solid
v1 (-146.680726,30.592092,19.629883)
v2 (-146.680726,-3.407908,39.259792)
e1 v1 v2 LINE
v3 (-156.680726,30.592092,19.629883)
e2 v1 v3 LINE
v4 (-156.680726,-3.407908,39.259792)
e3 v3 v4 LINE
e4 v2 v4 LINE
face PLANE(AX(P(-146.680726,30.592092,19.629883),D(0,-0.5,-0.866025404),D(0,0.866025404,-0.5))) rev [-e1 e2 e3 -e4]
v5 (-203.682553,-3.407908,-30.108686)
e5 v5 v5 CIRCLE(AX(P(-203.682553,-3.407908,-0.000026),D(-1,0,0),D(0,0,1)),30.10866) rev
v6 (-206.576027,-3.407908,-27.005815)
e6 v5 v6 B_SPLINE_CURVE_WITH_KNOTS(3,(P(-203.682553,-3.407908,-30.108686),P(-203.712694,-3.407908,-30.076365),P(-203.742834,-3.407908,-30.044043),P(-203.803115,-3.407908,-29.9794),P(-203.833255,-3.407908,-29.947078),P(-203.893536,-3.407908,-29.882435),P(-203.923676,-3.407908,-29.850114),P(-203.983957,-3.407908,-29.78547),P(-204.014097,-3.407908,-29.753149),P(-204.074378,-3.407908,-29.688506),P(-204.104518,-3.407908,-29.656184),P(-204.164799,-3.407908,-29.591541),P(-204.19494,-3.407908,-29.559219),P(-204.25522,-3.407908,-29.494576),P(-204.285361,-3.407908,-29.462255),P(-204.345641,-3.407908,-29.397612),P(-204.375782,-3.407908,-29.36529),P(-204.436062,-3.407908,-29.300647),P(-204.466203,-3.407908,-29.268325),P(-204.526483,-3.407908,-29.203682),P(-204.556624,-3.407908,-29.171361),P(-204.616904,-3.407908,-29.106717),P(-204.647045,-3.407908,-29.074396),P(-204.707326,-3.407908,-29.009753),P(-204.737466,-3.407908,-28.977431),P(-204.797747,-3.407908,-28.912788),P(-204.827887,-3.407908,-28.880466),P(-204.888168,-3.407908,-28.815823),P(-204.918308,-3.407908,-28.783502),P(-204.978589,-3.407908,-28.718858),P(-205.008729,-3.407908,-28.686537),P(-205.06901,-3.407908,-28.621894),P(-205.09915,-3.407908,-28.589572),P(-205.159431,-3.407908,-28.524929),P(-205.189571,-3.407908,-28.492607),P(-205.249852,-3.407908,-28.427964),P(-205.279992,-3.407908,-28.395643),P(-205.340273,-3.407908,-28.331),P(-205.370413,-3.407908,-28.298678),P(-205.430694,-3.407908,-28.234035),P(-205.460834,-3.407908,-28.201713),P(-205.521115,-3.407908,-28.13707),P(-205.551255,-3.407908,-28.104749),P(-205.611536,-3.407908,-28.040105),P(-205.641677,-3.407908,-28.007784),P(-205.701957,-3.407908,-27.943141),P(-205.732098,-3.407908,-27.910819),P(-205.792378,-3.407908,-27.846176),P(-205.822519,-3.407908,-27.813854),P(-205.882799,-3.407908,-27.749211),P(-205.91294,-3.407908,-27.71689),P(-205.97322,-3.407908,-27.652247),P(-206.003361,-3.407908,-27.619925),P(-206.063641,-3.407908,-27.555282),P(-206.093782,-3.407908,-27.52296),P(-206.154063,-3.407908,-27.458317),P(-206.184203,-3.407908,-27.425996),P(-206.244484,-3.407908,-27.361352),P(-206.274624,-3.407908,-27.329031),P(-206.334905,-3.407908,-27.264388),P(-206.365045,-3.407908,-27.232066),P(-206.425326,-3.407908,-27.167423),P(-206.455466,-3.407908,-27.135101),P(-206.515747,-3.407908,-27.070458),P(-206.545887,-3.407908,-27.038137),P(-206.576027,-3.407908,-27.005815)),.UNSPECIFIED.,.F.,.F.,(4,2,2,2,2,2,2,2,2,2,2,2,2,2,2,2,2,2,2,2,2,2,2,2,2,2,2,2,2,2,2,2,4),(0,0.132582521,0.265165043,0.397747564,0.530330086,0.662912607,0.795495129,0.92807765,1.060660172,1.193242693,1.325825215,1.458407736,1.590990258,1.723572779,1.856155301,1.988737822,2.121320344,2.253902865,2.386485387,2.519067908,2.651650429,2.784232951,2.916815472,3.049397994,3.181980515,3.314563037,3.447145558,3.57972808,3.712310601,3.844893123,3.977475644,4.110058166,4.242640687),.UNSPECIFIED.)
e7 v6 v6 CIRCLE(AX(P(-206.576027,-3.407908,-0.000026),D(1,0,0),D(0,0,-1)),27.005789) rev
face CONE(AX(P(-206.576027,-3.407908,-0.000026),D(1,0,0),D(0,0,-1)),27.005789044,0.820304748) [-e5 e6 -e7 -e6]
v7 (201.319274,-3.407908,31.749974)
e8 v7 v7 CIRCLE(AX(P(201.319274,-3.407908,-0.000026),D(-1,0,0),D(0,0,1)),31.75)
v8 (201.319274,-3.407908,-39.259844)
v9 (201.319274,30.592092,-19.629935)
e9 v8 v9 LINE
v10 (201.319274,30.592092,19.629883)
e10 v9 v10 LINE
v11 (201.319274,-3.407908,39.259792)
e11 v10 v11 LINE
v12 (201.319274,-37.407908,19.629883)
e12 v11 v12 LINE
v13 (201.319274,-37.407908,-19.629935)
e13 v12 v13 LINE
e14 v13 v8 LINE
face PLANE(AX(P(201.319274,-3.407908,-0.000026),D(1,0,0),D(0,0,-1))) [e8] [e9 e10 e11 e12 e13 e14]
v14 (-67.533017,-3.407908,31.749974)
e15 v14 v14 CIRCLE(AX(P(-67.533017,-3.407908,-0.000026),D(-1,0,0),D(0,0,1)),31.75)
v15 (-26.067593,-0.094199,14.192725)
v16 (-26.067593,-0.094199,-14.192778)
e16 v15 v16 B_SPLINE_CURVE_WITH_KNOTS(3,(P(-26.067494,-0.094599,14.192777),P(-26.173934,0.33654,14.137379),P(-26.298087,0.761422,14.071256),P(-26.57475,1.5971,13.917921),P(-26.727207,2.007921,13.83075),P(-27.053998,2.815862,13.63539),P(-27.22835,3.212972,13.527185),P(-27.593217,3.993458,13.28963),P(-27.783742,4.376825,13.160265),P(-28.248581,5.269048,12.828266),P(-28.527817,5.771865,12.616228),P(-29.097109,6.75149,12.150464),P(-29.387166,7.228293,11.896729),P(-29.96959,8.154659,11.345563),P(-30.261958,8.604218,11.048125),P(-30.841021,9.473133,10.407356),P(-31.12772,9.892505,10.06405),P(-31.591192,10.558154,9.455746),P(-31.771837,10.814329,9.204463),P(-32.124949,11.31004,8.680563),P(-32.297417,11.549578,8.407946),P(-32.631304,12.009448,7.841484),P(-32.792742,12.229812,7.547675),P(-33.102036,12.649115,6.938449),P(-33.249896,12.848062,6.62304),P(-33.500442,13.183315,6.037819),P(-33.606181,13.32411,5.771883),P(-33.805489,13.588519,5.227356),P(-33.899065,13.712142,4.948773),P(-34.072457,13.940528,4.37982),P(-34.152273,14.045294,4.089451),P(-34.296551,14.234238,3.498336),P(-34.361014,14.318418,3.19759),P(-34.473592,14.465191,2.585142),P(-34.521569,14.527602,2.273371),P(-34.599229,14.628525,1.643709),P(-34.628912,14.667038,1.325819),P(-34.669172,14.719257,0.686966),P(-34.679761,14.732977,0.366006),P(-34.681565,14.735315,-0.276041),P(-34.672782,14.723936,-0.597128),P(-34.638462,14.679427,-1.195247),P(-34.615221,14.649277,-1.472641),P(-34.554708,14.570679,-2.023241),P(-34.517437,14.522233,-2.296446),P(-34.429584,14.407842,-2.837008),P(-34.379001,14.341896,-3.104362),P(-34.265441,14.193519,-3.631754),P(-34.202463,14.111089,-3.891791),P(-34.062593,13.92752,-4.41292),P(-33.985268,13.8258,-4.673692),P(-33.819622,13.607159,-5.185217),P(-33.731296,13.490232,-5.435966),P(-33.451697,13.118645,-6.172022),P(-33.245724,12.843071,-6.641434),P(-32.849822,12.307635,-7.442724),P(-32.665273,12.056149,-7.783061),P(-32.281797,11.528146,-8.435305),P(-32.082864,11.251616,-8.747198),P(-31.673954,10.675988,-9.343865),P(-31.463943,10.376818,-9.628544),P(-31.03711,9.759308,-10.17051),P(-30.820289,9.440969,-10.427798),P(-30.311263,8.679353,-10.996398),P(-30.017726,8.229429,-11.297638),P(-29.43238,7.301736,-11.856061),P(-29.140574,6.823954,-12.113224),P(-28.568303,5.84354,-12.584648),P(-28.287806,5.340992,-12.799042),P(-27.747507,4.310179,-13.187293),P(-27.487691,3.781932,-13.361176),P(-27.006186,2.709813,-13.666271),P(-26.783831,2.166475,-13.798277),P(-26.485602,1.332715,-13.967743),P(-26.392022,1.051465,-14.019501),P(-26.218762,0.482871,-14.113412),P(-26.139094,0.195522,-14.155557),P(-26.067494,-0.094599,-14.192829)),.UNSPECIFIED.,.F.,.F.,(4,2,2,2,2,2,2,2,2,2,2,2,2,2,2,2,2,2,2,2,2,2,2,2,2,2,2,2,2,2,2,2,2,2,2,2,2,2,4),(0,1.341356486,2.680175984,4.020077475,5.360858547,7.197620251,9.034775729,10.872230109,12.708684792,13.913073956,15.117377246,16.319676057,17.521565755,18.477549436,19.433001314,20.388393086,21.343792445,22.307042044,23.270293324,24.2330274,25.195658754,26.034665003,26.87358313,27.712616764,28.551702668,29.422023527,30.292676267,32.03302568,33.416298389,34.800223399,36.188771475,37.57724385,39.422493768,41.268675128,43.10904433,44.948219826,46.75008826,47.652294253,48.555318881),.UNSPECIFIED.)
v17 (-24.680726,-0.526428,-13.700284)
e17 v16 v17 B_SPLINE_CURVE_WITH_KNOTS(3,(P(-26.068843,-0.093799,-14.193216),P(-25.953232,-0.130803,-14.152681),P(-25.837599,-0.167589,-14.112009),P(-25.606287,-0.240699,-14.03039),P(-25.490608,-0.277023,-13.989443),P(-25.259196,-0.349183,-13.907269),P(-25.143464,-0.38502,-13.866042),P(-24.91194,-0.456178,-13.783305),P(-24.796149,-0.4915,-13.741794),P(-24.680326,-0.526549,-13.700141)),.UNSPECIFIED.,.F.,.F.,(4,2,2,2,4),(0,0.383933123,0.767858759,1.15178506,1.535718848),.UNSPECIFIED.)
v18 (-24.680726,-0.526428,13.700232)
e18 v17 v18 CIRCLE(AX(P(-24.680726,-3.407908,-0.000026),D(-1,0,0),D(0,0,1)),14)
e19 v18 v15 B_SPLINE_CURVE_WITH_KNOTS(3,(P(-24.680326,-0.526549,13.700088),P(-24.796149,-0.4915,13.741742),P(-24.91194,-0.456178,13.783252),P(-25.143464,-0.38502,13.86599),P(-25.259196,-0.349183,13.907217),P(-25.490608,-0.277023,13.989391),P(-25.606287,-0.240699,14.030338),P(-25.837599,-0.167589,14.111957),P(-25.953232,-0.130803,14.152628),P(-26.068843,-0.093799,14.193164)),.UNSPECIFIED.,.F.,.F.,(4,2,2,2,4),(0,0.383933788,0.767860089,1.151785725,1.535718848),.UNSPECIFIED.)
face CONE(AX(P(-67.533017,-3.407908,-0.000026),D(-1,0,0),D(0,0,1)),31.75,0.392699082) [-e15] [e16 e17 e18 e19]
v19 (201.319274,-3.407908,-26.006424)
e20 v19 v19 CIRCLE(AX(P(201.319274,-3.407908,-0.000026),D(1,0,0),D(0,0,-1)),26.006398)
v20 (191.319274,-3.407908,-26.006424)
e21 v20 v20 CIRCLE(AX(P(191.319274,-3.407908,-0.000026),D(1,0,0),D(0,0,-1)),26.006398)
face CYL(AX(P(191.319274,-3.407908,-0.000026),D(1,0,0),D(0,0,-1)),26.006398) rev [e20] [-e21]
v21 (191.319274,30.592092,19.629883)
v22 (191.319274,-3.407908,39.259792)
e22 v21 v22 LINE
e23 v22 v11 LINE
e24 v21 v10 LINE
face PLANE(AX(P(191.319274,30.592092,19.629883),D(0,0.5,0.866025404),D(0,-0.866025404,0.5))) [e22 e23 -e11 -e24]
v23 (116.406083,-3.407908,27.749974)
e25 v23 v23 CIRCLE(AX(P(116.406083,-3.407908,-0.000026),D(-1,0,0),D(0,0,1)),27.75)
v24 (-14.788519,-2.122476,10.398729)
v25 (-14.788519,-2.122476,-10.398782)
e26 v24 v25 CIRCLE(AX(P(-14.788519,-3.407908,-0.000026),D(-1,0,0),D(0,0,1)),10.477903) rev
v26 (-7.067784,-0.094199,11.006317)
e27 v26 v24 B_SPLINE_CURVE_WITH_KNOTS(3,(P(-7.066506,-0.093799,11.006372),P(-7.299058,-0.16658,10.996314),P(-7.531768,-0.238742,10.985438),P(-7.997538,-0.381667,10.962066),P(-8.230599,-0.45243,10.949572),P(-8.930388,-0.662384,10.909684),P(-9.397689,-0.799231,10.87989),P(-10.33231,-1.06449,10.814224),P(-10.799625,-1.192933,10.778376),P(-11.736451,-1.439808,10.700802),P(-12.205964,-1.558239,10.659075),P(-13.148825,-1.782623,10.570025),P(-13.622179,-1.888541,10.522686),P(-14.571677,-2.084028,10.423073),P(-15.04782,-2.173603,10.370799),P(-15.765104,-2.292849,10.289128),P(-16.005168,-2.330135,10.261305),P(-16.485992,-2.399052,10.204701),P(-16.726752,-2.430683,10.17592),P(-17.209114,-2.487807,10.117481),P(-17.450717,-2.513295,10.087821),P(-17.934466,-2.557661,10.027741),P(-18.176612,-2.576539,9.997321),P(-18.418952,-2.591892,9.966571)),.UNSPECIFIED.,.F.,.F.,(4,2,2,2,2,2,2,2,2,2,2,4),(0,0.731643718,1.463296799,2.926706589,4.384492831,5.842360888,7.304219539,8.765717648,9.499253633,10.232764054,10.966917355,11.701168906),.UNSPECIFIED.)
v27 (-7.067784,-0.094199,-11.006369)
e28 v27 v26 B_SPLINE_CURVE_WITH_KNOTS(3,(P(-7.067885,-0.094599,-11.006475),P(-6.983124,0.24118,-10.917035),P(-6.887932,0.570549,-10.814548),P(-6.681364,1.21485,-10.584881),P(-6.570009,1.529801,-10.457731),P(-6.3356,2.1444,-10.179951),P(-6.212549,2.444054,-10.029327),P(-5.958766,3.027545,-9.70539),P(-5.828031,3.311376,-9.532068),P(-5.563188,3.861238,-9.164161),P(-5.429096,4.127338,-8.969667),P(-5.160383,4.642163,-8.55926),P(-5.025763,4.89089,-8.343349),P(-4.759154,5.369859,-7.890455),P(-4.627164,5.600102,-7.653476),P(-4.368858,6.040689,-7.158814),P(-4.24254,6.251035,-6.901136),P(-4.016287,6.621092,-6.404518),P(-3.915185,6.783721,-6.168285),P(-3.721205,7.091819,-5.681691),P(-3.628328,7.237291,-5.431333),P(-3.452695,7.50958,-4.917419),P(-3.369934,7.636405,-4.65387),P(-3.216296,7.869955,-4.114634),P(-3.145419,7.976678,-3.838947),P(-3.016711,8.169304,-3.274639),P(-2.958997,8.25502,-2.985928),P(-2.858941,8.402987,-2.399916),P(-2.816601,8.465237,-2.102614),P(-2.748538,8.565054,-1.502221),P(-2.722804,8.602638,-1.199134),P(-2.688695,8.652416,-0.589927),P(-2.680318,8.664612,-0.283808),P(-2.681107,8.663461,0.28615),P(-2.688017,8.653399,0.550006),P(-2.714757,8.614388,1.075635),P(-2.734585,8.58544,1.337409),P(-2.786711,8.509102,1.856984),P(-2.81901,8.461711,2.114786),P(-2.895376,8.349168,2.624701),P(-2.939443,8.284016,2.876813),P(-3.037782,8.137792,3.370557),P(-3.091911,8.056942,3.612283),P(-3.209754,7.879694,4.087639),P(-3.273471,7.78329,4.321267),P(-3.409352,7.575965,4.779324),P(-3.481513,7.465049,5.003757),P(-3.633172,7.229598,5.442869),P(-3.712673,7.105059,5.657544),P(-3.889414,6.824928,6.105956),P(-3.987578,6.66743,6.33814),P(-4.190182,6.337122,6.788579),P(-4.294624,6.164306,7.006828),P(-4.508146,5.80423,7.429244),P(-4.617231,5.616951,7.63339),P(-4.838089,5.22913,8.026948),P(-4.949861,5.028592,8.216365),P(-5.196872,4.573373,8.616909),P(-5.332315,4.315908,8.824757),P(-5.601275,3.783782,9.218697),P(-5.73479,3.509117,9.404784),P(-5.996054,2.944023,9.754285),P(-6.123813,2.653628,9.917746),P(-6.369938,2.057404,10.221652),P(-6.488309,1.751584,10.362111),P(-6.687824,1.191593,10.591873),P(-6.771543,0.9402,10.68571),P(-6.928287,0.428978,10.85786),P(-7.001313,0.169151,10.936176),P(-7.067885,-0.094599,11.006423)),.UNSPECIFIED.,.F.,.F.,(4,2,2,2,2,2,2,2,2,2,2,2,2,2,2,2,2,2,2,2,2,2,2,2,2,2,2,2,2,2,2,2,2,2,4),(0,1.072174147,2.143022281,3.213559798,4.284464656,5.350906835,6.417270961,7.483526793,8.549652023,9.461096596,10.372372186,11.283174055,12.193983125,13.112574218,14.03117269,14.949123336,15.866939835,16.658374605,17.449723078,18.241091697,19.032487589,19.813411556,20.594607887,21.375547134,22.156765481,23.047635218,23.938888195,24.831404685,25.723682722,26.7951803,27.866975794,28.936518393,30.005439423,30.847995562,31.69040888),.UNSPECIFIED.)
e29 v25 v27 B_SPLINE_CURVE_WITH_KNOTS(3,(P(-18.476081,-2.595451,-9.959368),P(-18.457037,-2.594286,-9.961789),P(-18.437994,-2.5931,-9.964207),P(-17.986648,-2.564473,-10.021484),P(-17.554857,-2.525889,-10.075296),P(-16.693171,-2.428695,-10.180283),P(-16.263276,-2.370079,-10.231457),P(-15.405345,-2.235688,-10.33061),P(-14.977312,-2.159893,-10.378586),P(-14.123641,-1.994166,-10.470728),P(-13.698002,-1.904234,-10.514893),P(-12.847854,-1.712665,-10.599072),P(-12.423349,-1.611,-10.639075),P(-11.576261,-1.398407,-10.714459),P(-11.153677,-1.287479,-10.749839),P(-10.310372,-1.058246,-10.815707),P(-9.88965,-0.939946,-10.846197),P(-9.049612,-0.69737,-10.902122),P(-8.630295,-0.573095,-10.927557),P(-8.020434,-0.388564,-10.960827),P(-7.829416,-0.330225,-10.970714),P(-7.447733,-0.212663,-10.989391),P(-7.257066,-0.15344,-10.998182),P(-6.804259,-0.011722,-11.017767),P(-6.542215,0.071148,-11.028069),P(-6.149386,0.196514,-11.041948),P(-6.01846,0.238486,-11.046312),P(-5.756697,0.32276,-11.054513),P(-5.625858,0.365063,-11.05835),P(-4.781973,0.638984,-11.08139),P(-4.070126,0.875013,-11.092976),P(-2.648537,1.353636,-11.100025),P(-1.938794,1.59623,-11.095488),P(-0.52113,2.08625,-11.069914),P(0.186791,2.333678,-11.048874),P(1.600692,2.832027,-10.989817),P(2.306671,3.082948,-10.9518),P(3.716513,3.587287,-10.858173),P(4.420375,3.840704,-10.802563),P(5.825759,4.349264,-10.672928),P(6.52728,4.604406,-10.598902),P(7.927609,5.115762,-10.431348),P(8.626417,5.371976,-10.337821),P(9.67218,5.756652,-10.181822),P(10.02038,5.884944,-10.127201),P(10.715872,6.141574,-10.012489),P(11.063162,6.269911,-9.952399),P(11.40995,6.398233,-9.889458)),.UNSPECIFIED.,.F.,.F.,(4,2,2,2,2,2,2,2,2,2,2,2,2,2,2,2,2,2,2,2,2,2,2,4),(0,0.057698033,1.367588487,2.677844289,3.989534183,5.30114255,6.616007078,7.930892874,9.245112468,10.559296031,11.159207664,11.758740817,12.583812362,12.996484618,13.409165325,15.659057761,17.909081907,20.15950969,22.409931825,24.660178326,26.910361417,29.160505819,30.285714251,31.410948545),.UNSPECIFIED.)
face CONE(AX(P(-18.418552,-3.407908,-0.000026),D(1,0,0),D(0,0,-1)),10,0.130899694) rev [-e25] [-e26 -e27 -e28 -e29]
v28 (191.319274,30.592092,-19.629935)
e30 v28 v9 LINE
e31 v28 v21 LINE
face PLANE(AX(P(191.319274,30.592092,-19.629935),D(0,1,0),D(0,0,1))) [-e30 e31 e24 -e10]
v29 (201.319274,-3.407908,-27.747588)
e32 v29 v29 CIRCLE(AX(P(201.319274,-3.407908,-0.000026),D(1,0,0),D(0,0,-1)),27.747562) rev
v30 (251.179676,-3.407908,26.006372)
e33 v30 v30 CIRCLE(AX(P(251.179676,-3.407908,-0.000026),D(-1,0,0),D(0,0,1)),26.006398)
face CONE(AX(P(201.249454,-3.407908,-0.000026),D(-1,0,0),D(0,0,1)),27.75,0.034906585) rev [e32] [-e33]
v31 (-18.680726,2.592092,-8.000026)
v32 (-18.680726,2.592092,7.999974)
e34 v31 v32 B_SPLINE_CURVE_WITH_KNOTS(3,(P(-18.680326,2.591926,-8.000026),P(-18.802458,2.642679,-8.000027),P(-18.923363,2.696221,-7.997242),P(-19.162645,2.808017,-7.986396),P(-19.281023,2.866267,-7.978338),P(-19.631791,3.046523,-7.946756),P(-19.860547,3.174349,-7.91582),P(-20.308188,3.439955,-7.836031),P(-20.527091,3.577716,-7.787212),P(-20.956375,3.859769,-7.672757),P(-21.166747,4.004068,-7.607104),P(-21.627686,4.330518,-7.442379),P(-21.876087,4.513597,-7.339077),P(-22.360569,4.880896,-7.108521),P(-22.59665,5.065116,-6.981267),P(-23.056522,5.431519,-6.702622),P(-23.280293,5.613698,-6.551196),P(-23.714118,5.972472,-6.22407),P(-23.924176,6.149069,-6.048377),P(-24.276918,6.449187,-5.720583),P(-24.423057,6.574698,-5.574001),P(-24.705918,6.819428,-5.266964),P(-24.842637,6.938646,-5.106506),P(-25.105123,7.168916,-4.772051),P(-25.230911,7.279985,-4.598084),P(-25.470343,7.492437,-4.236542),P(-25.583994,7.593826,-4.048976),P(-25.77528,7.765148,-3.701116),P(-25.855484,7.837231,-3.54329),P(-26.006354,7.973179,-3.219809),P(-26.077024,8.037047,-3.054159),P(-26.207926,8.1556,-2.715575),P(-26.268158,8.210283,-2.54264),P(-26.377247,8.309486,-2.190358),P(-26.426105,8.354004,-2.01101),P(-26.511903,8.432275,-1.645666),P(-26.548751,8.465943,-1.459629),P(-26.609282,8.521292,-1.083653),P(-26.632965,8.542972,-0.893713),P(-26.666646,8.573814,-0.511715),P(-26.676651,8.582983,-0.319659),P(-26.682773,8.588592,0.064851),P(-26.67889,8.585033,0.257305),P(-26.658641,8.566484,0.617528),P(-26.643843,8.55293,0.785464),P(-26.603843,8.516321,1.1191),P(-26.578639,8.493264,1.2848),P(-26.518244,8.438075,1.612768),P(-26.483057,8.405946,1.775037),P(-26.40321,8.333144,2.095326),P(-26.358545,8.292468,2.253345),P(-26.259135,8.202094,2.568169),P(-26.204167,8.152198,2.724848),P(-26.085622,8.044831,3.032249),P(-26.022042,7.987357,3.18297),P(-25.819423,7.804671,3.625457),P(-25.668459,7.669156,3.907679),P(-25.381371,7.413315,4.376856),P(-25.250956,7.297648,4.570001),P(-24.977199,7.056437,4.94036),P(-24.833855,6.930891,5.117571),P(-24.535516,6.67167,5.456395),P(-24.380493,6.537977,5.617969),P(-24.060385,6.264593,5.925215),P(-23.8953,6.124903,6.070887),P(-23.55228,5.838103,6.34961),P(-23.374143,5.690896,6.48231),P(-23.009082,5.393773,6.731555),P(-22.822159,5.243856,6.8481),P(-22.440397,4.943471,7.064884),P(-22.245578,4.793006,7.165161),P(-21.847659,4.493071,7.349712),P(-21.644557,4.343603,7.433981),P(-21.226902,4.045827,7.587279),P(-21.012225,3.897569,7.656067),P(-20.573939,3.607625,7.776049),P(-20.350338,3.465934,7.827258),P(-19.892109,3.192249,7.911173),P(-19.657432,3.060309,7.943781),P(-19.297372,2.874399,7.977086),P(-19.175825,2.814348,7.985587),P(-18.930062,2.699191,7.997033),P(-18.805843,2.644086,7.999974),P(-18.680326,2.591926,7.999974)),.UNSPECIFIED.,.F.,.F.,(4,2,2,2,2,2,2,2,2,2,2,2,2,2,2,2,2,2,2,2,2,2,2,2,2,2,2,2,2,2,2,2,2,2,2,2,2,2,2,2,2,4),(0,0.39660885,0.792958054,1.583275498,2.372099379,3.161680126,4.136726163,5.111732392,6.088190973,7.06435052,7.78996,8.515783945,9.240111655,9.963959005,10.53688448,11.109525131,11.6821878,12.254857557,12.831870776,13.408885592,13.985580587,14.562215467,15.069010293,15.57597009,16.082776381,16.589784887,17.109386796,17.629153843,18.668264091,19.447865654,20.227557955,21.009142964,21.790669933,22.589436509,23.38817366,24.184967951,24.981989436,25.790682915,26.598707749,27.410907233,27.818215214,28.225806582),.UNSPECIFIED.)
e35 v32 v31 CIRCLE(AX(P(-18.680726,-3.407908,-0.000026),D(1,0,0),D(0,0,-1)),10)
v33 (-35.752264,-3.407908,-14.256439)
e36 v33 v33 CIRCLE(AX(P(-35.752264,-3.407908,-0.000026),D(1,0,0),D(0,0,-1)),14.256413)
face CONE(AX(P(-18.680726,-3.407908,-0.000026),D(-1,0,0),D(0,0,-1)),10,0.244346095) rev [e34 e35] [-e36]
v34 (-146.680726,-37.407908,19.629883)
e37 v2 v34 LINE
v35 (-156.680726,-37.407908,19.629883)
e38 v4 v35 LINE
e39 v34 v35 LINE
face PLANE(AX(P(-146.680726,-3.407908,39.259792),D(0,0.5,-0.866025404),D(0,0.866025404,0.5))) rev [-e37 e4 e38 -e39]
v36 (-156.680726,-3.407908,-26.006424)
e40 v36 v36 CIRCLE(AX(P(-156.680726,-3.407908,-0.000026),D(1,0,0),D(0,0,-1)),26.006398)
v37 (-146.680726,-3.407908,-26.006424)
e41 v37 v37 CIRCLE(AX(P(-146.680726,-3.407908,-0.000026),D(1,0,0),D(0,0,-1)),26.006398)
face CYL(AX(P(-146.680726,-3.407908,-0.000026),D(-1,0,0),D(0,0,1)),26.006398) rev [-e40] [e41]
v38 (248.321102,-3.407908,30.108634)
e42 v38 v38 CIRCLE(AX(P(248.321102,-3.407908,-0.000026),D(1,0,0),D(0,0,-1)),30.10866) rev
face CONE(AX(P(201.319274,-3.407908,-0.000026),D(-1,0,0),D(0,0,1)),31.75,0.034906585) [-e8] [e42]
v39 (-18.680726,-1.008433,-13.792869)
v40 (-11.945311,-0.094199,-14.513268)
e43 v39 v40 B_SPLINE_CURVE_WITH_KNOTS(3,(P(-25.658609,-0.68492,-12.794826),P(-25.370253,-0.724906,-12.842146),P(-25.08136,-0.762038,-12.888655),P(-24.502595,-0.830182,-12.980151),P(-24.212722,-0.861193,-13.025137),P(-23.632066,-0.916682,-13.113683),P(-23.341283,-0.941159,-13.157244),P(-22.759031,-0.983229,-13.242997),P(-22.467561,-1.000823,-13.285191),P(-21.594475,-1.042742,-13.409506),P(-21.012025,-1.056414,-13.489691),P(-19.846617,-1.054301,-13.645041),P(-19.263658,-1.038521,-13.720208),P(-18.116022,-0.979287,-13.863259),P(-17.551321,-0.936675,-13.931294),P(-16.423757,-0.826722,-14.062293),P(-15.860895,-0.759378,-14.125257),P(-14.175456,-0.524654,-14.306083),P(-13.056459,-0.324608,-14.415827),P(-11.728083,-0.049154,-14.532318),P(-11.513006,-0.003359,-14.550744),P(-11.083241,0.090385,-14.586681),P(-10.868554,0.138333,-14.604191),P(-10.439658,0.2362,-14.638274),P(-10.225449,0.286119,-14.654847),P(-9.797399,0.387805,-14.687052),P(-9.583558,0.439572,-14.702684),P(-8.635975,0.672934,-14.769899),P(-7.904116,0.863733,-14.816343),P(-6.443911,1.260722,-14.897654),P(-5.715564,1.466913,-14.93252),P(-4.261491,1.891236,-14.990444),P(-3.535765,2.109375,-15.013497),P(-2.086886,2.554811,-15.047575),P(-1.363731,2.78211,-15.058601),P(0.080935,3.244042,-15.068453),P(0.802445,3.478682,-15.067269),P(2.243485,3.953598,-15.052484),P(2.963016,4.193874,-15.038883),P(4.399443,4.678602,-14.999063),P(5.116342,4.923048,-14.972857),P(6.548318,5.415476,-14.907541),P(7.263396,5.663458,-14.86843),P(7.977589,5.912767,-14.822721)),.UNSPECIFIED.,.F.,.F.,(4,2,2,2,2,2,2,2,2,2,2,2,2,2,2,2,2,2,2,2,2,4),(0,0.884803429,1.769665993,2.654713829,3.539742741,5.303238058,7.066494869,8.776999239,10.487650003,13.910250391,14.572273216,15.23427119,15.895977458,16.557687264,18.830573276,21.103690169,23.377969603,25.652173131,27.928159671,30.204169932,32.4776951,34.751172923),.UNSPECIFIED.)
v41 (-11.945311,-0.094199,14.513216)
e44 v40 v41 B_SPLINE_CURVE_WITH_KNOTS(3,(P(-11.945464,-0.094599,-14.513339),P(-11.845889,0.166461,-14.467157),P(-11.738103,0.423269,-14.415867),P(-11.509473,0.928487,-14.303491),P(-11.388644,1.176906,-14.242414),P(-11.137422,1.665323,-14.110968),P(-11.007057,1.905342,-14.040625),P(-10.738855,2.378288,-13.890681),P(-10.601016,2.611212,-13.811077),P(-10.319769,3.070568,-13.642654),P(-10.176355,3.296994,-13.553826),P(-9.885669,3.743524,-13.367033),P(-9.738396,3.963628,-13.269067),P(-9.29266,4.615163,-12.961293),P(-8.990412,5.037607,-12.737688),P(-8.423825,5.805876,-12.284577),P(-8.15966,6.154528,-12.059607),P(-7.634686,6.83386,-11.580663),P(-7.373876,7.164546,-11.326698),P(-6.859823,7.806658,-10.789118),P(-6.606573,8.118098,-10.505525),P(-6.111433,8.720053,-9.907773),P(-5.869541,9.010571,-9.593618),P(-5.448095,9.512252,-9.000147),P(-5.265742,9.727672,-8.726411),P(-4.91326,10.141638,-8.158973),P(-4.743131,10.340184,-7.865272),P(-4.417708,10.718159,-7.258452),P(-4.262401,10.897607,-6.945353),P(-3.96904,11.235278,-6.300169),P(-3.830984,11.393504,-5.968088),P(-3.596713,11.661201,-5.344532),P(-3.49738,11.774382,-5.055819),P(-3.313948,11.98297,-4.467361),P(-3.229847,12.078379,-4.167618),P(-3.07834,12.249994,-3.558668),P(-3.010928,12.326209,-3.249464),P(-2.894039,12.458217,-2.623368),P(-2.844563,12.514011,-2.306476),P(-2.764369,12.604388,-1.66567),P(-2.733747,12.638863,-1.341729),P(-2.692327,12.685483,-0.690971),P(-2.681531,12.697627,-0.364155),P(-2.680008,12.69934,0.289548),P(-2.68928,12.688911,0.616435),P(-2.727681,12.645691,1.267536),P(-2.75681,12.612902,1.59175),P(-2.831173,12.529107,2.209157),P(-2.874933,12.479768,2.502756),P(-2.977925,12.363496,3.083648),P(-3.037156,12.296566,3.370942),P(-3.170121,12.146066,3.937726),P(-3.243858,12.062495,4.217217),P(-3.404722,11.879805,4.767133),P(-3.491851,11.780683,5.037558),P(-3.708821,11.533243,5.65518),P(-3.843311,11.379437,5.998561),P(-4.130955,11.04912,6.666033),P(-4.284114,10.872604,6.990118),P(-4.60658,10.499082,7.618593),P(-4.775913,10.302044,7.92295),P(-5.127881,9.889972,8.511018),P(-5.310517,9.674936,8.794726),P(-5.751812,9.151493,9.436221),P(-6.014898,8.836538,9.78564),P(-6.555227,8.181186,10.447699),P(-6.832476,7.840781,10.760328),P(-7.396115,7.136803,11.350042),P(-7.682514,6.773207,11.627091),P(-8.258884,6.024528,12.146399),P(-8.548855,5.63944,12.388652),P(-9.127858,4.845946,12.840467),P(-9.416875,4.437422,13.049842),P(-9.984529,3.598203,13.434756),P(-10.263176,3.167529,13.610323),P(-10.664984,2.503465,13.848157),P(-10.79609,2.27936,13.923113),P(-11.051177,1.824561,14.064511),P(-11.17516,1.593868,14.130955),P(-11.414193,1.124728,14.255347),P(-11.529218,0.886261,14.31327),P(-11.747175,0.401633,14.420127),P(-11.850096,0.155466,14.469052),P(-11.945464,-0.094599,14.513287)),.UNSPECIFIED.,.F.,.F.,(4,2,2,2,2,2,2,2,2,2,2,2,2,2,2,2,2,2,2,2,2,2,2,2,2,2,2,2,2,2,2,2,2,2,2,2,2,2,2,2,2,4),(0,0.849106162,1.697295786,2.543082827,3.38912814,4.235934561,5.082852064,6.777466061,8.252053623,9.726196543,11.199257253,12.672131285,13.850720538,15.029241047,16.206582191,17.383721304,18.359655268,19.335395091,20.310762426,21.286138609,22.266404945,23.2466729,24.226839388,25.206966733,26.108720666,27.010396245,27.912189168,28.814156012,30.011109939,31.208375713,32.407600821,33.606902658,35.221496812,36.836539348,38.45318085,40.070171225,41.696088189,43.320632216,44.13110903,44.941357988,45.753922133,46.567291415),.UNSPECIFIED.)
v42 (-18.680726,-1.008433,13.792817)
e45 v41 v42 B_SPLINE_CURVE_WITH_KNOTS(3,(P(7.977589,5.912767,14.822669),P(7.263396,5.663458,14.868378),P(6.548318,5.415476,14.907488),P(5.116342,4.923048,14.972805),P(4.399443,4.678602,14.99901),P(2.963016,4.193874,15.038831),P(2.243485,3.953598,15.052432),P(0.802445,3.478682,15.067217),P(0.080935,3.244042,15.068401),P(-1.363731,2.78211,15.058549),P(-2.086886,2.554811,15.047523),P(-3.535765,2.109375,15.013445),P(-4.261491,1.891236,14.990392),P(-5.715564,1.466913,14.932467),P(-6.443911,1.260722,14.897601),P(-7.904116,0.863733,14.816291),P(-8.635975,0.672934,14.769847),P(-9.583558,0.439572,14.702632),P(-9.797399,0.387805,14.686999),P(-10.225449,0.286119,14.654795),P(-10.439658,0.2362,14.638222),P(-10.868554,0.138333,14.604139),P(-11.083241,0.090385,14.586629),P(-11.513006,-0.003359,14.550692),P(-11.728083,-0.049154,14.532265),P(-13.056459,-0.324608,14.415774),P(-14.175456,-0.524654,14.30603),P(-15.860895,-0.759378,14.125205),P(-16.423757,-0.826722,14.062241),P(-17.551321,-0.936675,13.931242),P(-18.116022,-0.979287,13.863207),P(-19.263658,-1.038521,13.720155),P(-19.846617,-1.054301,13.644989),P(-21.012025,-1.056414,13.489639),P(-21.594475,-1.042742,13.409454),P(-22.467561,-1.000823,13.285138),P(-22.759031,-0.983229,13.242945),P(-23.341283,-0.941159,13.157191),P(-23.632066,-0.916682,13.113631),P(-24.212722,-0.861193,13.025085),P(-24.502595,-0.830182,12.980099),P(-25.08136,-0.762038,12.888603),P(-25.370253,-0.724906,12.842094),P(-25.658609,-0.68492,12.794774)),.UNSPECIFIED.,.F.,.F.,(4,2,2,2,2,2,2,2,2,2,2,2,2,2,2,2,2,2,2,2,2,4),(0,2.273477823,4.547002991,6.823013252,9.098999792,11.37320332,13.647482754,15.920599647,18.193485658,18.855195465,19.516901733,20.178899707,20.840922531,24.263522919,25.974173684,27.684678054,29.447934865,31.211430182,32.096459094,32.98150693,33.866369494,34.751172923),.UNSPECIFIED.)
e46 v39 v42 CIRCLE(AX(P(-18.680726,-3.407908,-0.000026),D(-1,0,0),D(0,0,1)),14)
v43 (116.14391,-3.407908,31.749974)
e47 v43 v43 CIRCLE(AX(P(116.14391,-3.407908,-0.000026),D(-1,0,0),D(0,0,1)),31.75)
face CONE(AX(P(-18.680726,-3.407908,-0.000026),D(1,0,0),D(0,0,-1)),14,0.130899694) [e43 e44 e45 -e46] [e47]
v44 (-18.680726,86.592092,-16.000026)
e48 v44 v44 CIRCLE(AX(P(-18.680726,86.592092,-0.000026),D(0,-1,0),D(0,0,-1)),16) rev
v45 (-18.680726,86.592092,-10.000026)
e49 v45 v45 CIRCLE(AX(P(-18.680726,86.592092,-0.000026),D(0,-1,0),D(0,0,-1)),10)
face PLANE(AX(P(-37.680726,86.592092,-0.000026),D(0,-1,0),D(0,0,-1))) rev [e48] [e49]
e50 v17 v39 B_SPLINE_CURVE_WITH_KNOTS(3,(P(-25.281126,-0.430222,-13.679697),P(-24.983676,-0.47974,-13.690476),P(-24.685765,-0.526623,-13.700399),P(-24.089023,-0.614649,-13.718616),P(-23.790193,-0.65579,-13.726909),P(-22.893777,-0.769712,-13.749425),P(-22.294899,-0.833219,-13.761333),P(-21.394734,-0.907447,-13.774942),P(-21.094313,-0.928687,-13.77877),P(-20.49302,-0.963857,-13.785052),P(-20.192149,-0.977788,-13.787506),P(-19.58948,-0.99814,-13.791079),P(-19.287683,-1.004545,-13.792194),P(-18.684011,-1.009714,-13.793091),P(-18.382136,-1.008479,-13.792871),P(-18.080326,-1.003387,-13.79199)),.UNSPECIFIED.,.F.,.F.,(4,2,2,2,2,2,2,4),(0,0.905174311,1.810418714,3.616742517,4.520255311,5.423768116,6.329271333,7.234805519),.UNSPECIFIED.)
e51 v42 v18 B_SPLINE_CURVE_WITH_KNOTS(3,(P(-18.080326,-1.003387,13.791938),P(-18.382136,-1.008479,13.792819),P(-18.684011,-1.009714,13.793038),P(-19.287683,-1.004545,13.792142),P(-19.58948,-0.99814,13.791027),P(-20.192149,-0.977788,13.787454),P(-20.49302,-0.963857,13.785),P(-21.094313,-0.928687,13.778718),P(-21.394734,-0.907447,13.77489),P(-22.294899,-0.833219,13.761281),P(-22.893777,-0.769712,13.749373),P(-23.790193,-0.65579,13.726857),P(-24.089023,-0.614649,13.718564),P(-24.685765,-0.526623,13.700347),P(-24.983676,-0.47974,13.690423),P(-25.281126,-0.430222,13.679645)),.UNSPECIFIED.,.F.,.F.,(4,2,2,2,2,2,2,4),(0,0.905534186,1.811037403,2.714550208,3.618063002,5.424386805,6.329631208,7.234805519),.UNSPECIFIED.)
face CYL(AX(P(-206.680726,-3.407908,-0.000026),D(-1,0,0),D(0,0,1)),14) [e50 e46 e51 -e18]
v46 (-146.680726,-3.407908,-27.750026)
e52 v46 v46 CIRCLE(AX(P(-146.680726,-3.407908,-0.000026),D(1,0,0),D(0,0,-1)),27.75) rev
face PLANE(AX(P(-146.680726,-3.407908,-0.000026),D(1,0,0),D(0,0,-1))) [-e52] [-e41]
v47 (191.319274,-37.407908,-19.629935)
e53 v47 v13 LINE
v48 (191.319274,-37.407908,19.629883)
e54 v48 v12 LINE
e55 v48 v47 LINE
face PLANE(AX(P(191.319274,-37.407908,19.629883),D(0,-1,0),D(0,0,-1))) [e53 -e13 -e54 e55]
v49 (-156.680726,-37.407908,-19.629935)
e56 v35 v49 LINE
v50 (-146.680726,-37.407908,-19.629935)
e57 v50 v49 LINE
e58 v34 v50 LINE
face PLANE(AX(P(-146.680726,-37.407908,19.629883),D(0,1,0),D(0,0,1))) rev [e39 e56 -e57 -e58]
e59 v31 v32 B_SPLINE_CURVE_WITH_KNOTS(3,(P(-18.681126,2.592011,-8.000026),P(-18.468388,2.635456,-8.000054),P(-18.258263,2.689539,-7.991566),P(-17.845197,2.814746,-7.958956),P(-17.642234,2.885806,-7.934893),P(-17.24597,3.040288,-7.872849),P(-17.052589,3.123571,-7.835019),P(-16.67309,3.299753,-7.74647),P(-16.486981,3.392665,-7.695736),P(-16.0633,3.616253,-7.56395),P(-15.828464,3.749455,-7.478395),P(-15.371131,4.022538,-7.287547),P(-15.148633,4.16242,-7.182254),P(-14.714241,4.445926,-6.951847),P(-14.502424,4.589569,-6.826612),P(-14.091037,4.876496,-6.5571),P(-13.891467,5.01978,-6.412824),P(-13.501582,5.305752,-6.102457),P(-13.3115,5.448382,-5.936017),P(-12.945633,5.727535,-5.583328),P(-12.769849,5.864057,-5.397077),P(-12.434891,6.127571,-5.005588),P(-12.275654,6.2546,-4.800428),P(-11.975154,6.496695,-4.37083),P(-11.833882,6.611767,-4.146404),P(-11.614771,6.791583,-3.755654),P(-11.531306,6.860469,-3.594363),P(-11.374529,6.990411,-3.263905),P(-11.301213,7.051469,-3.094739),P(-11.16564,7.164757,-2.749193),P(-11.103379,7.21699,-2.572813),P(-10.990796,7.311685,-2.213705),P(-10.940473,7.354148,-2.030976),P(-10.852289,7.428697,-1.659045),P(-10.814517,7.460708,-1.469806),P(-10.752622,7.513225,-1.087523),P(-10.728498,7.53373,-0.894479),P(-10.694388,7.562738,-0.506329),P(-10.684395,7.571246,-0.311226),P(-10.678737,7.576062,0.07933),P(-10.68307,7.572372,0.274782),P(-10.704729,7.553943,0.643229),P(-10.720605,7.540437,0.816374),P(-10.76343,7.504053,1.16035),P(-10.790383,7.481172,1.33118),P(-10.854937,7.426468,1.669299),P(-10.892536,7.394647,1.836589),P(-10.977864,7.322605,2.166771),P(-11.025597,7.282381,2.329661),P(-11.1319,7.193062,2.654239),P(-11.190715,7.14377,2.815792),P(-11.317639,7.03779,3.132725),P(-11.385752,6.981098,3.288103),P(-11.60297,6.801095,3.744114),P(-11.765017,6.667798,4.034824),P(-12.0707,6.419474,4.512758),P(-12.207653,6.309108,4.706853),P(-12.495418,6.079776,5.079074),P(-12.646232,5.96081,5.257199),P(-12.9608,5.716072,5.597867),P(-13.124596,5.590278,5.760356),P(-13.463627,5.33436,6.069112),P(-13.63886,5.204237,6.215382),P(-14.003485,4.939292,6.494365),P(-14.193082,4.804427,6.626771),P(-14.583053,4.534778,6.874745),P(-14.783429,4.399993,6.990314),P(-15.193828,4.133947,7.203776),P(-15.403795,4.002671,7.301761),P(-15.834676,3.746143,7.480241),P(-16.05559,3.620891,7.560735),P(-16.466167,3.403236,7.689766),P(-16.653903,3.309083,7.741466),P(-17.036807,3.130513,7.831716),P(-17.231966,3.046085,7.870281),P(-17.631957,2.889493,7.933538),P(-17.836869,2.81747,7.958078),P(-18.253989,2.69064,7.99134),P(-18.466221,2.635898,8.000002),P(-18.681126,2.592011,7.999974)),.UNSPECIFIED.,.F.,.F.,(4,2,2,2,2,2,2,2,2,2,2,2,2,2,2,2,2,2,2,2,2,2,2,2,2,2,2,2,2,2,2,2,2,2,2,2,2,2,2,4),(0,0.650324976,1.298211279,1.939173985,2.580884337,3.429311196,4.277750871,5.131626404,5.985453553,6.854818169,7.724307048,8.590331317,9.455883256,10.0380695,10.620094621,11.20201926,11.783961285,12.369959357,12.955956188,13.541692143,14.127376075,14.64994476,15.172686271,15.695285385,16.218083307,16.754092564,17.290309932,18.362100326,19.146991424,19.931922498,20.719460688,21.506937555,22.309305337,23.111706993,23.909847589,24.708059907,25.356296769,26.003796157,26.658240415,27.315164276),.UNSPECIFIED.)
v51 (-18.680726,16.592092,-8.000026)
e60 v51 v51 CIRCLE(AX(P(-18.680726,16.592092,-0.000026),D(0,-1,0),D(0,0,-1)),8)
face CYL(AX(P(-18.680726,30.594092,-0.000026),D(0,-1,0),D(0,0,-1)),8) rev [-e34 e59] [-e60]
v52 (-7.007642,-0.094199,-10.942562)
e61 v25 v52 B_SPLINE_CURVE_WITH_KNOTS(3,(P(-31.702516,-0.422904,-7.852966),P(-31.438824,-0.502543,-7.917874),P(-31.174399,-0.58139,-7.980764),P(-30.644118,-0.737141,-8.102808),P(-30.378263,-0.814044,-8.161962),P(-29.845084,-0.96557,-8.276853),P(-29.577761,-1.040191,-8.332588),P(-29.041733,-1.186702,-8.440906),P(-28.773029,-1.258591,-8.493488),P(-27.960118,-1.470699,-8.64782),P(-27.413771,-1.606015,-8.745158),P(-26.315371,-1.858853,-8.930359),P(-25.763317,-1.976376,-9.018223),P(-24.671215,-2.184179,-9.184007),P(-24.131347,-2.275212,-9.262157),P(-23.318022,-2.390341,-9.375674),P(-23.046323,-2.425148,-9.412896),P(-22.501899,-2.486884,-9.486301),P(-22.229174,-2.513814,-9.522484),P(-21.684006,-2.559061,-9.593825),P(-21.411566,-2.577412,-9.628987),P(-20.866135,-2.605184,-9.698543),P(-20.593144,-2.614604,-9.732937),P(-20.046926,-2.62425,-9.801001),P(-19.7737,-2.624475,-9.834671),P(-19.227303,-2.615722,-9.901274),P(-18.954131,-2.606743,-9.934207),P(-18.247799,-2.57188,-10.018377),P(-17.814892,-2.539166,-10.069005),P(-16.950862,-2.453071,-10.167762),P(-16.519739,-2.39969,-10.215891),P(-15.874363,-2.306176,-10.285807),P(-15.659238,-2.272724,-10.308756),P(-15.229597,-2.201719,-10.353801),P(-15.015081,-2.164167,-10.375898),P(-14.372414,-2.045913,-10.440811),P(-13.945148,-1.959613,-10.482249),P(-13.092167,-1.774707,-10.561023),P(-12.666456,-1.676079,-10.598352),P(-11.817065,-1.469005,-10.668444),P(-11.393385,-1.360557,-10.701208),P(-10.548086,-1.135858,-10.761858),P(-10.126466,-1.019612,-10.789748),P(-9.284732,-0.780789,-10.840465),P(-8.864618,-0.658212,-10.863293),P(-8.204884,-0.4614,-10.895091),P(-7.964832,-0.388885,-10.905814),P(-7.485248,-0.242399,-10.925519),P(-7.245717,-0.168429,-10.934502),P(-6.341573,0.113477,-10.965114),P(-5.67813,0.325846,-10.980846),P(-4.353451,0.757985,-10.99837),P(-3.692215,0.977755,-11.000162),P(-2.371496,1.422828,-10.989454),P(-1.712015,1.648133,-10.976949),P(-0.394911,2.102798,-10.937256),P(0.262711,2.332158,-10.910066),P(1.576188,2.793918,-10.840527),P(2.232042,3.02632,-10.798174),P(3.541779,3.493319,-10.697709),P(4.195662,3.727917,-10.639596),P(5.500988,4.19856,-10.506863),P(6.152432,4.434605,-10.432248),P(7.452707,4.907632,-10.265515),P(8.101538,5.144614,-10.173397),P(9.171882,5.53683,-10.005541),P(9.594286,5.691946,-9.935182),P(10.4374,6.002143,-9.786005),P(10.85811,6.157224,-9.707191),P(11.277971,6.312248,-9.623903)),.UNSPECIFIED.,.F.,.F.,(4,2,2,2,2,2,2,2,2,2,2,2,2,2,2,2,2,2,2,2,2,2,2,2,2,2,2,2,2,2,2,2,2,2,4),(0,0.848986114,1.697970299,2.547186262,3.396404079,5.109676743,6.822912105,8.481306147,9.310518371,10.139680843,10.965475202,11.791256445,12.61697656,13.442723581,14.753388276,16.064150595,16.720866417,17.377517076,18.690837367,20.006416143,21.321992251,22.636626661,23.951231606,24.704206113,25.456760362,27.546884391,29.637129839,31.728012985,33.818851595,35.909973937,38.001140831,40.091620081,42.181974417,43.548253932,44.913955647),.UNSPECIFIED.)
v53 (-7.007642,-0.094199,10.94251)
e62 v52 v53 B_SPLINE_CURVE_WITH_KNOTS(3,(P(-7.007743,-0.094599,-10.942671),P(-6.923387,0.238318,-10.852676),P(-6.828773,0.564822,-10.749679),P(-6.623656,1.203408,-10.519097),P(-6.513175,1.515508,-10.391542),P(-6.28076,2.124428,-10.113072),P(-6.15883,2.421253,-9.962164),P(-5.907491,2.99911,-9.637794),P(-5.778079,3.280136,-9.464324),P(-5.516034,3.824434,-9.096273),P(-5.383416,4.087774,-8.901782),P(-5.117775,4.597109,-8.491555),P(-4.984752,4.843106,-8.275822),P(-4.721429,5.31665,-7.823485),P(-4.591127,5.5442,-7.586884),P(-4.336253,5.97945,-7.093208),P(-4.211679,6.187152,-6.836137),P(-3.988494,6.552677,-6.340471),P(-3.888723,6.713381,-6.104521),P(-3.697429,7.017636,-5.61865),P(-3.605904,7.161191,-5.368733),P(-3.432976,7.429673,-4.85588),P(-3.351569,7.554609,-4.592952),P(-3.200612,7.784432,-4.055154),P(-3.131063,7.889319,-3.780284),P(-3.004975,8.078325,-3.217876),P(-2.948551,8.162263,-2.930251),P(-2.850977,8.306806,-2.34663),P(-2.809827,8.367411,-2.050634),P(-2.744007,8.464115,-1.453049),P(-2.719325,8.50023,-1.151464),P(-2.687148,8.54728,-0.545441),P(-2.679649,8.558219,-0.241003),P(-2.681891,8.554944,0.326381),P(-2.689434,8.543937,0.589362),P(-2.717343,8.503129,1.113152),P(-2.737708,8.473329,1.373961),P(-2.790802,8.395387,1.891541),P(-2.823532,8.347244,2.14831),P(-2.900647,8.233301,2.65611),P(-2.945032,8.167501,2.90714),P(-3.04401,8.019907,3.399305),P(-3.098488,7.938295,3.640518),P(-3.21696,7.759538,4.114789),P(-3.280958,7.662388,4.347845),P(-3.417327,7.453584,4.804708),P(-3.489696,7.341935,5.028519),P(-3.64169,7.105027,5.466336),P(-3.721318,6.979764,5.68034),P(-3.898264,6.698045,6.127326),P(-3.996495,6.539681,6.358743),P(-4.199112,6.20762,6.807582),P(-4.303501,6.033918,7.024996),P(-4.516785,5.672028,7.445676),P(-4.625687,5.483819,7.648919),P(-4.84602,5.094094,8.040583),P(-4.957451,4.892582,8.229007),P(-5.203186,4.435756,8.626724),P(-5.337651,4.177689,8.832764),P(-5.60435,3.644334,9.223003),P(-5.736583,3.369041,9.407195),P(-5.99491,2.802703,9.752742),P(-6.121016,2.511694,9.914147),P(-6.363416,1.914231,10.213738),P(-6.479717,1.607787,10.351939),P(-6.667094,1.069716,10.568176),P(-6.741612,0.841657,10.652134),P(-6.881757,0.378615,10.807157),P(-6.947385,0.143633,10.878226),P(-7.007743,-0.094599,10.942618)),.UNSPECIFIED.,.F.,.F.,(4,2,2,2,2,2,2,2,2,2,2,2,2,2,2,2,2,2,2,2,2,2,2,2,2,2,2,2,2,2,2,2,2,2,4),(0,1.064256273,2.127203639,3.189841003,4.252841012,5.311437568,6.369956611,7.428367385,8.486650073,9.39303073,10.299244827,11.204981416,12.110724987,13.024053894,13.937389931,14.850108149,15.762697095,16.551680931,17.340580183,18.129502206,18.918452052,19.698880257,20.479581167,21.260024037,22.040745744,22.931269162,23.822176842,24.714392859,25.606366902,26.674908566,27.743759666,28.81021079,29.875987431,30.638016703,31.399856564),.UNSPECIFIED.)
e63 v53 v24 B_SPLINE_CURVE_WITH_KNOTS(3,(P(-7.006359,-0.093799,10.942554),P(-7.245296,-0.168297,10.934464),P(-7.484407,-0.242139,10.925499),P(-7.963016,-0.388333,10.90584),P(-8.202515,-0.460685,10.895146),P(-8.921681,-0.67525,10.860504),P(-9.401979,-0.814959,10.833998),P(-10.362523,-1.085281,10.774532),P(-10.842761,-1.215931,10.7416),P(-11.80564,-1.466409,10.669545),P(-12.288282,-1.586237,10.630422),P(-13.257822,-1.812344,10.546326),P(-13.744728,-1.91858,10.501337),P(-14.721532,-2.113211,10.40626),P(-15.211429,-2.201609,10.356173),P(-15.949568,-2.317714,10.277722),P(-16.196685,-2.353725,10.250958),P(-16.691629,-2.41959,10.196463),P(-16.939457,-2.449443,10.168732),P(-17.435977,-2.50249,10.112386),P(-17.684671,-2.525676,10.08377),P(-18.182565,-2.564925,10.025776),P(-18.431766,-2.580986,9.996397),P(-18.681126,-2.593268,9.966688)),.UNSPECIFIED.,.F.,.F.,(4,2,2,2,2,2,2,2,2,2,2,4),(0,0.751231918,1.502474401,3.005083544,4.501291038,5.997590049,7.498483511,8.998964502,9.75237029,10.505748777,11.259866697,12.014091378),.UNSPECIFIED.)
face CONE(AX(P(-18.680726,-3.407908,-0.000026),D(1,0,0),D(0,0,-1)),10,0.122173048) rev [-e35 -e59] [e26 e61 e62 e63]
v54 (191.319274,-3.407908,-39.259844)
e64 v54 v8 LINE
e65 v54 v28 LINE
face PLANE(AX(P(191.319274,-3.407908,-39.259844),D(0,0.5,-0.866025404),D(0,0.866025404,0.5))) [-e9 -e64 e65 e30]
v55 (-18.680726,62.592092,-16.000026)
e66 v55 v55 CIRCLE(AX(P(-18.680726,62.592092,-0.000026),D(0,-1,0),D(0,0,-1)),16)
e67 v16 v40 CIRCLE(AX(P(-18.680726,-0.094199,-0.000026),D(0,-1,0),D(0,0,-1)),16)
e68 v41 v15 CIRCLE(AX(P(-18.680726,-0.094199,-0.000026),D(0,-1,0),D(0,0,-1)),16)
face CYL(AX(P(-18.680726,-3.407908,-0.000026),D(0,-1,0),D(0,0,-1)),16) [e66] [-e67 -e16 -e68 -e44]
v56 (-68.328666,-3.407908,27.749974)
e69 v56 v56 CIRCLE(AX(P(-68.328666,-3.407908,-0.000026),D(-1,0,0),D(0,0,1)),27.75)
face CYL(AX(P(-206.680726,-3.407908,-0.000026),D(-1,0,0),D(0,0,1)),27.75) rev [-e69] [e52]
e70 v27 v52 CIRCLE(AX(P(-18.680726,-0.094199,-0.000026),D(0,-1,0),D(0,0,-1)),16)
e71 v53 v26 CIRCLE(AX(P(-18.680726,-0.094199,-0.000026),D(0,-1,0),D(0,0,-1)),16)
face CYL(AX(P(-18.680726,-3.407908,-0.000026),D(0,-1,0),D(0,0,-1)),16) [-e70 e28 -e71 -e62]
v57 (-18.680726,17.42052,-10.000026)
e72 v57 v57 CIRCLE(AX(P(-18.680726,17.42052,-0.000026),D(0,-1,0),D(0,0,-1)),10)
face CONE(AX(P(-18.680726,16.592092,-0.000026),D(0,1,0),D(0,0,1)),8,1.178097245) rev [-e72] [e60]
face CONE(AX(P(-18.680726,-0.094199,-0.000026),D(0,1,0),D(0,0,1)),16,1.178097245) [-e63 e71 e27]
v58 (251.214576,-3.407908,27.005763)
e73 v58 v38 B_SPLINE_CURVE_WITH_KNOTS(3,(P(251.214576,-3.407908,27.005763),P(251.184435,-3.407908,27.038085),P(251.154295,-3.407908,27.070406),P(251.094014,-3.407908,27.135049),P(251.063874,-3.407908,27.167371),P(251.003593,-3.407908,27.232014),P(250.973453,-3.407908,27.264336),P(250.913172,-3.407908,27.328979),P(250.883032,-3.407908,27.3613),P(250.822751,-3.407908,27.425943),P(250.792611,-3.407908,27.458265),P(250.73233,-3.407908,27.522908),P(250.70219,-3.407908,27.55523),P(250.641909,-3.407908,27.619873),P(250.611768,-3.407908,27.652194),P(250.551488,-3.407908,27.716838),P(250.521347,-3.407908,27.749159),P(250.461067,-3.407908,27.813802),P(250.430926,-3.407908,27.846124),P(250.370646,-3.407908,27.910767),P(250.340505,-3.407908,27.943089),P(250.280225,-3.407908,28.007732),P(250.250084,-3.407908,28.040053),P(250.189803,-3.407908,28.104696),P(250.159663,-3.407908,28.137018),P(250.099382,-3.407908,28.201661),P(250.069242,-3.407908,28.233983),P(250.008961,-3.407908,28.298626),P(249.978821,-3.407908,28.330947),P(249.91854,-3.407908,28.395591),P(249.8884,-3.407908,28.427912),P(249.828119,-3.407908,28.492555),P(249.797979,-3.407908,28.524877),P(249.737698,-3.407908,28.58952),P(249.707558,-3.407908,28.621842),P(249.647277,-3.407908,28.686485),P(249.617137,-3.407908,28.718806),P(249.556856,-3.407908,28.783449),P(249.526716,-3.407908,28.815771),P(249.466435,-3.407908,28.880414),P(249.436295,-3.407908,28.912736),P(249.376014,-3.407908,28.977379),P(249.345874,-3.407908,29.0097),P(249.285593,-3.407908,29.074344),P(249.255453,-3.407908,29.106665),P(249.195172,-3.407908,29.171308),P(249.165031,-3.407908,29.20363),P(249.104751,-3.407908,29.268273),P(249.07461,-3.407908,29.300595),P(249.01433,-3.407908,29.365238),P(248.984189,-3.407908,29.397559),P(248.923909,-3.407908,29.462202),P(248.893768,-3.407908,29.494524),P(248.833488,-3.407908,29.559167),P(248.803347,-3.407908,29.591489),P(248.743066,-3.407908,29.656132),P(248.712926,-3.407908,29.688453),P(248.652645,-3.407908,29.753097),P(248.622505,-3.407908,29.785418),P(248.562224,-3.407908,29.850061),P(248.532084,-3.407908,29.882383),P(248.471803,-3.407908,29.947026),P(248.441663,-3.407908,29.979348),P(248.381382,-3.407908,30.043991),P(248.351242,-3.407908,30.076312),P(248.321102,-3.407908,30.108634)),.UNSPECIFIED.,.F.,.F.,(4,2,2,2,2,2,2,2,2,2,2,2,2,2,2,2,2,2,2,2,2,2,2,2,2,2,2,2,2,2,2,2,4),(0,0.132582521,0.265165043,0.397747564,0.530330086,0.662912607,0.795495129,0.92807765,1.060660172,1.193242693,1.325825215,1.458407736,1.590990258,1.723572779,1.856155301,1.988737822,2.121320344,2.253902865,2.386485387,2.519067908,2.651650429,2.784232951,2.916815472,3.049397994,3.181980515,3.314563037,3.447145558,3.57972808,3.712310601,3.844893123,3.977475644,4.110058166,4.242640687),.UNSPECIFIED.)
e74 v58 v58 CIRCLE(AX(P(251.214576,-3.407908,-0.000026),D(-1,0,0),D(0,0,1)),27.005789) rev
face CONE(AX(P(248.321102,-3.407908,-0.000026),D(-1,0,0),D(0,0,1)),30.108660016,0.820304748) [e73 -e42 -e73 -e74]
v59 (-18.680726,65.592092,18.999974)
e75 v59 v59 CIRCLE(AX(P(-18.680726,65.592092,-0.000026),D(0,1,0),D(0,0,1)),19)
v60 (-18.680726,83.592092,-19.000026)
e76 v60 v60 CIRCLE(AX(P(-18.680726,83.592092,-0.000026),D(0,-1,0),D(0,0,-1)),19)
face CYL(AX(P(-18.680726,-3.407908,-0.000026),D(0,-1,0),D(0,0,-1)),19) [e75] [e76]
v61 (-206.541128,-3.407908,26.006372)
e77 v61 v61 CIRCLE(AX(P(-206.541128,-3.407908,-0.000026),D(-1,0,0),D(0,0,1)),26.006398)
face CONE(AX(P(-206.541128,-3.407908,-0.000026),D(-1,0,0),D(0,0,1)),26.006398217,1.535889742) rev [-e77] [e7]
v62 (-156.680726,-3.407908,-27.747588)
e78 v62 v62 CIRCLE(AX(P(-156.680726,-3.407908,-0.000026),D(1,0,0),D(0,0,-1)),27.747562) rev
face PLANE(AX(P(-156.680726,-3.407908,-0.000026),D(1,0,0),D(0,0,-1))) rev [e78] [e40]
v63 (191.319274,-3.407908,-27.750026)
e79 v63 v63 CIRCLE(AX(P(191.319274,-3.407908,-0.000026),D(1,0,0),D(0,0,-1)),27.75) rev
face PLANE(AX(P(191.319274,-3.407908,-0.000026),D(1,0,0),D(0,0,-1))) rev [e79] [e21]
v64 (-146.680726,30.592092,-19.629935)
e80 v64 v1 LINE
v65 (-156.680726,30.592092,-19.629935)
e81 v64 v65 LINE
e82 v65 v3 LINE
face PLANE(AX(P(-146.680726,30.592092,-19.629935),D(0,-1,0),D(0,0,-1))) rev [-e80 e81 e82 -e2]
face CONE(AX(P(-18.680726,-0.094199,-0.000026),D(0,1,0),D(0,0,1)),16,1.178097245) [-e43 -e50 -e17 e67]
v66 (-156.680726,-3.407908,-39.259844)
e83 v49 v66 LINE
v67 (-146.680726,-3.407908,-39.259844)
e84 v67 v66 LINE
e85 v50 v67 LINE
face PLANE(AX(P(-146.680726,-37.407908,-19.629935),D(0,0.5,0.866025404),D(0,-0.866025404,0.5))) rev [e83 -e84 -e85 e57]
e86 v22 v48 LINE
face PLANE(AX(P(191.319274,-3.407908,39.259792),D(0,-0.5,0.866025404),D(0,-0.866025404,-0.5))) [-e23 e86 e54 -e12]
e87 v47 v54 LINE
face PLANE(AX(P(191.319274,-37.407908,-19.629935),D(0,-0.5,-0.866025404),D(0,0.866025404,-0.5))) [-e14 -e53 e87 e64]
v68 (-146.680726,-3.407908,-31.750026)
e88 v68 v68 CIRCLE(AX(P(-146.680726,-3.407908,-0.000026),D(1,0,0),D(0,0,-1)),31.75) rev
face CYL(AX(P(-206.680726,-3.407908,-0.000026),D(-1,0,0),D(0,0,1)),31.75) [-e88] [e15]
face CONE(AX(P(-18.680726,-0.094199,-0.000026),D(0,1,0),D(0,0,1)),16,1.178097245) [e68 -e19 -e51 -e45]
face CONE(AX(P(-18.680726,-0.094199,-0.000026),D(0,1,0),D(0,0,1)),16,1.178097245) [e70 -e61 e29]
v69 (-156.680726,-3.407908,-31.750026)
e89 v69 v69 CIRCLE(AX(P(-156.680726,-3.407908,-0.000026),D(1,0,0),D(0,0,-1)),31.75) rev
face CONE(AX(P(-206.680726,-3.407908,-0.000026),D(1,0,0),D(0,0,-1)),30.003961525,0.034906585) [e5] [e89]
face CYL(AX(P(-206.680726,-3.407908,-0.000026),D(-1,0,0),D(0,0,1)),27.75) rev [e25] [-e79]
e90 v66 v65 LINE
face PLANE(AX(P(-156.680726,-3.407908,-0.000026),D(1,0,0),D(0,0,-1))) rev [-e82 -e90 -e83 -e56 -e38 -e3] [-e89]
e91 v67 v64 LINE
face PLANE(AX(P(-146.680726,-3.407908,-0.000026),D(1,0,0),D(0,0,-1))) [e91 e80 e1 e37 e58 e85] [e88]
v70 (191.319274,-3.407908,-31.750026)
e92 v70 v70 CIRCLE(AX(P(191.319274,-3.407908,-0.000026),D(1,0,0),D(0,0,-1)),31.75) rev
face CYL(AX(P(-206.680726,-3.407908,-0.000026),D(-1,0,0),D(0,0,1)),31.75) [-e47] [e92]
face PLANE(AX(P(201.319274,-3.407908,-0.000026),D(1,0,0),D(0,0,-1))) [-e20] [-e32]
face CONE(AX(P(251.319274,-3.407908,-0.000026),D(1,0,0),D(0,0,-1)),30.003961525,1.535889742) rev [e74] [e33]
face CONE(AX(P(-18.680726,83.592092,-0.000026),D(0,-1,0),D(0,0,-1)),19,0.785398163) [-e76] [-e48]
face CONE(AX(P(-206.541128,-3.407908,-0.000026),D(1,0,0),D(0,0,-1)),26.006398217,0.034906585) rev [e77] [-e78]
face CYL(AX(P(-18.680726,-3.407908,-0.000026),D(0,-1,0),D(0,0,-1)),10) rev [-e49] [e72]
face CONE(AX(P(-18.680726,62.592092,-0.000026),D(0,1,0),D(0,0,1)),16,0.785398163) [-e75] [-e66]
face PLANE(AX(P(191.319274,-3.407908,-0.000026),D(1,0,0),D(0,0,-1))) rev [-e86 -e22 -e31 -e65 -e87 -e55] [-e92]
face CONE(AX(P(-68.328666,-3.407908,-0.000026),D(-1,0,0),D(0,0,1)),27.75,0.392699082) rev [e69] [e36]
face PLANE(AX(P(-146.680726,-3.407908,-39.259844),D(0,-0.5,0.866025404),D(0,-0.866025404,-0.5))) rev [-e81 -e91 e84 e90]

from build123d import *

# Parameters (mm, degrees)
SKETCH2_R           = 13.003199109
BOSS_EXTRUDE1_DEPTH = 5
BOSS_EXTRUDE2_START = -5
SKETCH3_R           = 13.003199109
BOSS_EXTRUDE2_DEPTH = 5
CHAMFER1_SIZE       = 1.5
CUT_EXTRUDE1_REACH  = 139.423
SKETCH4_R           = 4
CHAMFER2_SIZE       = 1.5
SKETCH7_R           = 5
CUT_EXTRUDE2_DEPTH  = 10
CUT_EXTRUDE2_DRAFT  = 14
SKETCH7_2_R         = 5
CUT_EXTRUDE3_DEPTH  = 10
CUT_EXTRUDE3_DRAFT  = -7
SCALE1_SCALE        = 2


with BuildPart() as part:
    # Sketch1 → Revolve-Thin1 (revolve)
    with BuildSketch(Plane.XY, mode=Mode.PRIVATE) as revolve_thin1_sk:
        Polygon((-94, 15.001980763), (-69, 15.875), (-24.426145366, 15.875), (-3, 7), (0, 7), (67.41231775, 15.875), (110, 15.875), (135, 15.001980763), (134.930201007, 13.003199109), (109.96508987, 13.875), (67.543404676, 13.875), (0.131086926, 5), (-3.397824735, 5), (-24.823970101, 13.875), (-68.96508987, 13.875), (-93.930201007, 13.003199109), align=None)
    revolve(revolve_thin1_sk.sketch.rotate(Axis((-94, 0, 0), (1, 0, 0)), 90), axis=Axis((-94, 0, 0), (1, 0, 0)))

    # Sketch2 → Boss-Extrude1 (add)
    with BuildSketch(Plane(origin=(-69, 0, 0), x_dir=(0, 0, -1), z_dir=(1, 0, 0))):
        Polygon((19.629909152, 0), (9.814954576, 17), (-9.814954576, 17), (-19.629909152, 0), (-9.814954576, -17), (9.814954576, -17), align=None)
        Circle(SKETCH2_R, mode=Mode.SUBTRACT)
    extrude(amount=BOSS_EXTRUDE1_DEPTH)

    # Sketch3 → Boss-Extrude2 (add)
    with BuildSketch(Plane(origin=(110, 0, 0), x_dir=(0, 0, -1), z_dir=(1, 0, 0)).offset(BOSS_EXTRUDE2_START)):
        Polygon((19.629909152, 0), (9.814954576, 17), (-9.814954576, 17), (-19.629909152, 0), (-9.814954576, -17), (9.814954576, -17), align=None)
        Circle(SKETCH3_R, mode=Mode.SUBTRACT)
    extrude(amount=BOSS_EXTRUDE2_DEPTH)

    # Chamfer1
    chamfer1_edges = [part.edges().sort_by_distance(p)[0] for p in [
        (135, 0, -15.001980763),
        (-94, 0, -15.001980763),
    ]]
    chamfer(chamfer1_edges, length=CHAMFER1_SIZE)

    # Sketch4 → Cut-Extrude1 (cut, up to next)
    with BuildSketch(Plane(origin=(0, 0, 0), x_dir=(1, 0, 0), z_dir=(0, 1, 0)), mode=Mode.PRIVATE) as cut_extrude1_sk1:
        with Locations(Location((0, 0, 0), (0, 0, 90))):
            Circle(SKETCH4_R)
    cut_extrude1_tool1 = extrude(cut_extrude1_sk1.sketch, amount=CUT_EXTRUDE1_REACH, mode=Mode.PRIVATE) & part.part
    add(cut_extrude1_tool1.solids().sort_by_distance((0, 0, 0))[0], mode=Mode.SUBTRACT)

    # Sketch5 → Revolve3 (revolve)
    with BuildSketch(Plane.XY, mode=Mode.PRIVATE) as revolve3_sk:
        Polygon((-4, 0), (-8, 1.656854249), (-8, 33), (-9.5, 33), (-9.5, 45), (-5, 45), (-5, 10.414213562), (-4, 10), align=None)
    revolve(revolve3_sk.sketch.rotate(Axis((0, 0, 0), (0, 1, 0)), 270), axis=Axis((0, 0, 0), (0, 1, 0)))

    # Chamfer2
    chamfer2_edges = [part.edges().sort_by_distance(p)[0] for p in [
        (0, 33, 9.5),
        (0, 45, 9.5),
    ]]
    chamfer(chamfer2_edges, length=CHAMFER2_SIZE - 0.0001)  # a hair under: the kernel refuses the full size


with BuildPart() as cut_extrude2_tool:
    # Sketch7 → Cut-Extrude2 (with draft: the straight prism first)
    with BuildSketch(Plane(origin=(0, 0, 0), x_dir=(0, 0, -1), z_dir=(1, 0, 0))):
        Circle(SKETCH7_R)
    extrude(amount=-CUT_EXTRUDE2_DEPTH)
    # Cut-Extrude2: the draft: its side faces are tilted about the plane it starts from
    cut_extrude2_sides = [cut_extrude2_tool.faces().sort_by_distance(p)[0] for p in [
        (-5, 0, 5),
    ]]
    draft(cut_extrude2_sides, Plane(origin=(0, 0, 0), x_dir=(0, 0, -1), z_dir=(1, 0, 0)), CUT_EXTRUDE2_DRAFT)


with BuildPart() as part_1:
    add(part.part)

    # Cut-Extrude2: cut by cut_extrude2_tool
    add(cut_extrude2_tool.part, mode=Mode.SUBTRACT)


with BuildPart() as cut_extrude3_tool:
    # Sketch7<2> → Cut-Extrude3 (with draft: the straight prism first)
    with BuildSketch(Plane(origin=(0, 0, 0), x_dir=(0, 0, -1), z_dir=(1, 0, 0))):
        Circle(SKETCH7_2_R)
    extrude(amount=CUT_EXTRUDE3_DEPTH)
    # Cut-Extrude3: the draft: its side faces are tilted about the plane it starts from
    cut_extrude3_sides = [cut_extrude3_tool.faces().sort_by_distance(p)[0] for p in [
        (5, 0, 5),
    ]]
    draft(cut_extrude3_sides, Plane(origin=(0, 0, 0), x_dir=(0, 0, -1), z_dir=(1, 0, 0)), CUT_EXTRUDE3_DRAFT)


with BuildPart() as part_2:
    add(part_1.part)

    # Cut-Extrude3: cut by cut_extrude3_tool
    add(cut_extrude3_tool.part, mode=Mode.SUBTRACT)


with BuildPart() as part_3:
    # Scale1: scaled about (18.680604314, 3.407991009, 5.57e-07)
    add(part_2.part.scale(SCALE1_SCALE).moved(Location((-18.680604314, -3.407991009, -5.57e-07))))


solid = part_3.part
